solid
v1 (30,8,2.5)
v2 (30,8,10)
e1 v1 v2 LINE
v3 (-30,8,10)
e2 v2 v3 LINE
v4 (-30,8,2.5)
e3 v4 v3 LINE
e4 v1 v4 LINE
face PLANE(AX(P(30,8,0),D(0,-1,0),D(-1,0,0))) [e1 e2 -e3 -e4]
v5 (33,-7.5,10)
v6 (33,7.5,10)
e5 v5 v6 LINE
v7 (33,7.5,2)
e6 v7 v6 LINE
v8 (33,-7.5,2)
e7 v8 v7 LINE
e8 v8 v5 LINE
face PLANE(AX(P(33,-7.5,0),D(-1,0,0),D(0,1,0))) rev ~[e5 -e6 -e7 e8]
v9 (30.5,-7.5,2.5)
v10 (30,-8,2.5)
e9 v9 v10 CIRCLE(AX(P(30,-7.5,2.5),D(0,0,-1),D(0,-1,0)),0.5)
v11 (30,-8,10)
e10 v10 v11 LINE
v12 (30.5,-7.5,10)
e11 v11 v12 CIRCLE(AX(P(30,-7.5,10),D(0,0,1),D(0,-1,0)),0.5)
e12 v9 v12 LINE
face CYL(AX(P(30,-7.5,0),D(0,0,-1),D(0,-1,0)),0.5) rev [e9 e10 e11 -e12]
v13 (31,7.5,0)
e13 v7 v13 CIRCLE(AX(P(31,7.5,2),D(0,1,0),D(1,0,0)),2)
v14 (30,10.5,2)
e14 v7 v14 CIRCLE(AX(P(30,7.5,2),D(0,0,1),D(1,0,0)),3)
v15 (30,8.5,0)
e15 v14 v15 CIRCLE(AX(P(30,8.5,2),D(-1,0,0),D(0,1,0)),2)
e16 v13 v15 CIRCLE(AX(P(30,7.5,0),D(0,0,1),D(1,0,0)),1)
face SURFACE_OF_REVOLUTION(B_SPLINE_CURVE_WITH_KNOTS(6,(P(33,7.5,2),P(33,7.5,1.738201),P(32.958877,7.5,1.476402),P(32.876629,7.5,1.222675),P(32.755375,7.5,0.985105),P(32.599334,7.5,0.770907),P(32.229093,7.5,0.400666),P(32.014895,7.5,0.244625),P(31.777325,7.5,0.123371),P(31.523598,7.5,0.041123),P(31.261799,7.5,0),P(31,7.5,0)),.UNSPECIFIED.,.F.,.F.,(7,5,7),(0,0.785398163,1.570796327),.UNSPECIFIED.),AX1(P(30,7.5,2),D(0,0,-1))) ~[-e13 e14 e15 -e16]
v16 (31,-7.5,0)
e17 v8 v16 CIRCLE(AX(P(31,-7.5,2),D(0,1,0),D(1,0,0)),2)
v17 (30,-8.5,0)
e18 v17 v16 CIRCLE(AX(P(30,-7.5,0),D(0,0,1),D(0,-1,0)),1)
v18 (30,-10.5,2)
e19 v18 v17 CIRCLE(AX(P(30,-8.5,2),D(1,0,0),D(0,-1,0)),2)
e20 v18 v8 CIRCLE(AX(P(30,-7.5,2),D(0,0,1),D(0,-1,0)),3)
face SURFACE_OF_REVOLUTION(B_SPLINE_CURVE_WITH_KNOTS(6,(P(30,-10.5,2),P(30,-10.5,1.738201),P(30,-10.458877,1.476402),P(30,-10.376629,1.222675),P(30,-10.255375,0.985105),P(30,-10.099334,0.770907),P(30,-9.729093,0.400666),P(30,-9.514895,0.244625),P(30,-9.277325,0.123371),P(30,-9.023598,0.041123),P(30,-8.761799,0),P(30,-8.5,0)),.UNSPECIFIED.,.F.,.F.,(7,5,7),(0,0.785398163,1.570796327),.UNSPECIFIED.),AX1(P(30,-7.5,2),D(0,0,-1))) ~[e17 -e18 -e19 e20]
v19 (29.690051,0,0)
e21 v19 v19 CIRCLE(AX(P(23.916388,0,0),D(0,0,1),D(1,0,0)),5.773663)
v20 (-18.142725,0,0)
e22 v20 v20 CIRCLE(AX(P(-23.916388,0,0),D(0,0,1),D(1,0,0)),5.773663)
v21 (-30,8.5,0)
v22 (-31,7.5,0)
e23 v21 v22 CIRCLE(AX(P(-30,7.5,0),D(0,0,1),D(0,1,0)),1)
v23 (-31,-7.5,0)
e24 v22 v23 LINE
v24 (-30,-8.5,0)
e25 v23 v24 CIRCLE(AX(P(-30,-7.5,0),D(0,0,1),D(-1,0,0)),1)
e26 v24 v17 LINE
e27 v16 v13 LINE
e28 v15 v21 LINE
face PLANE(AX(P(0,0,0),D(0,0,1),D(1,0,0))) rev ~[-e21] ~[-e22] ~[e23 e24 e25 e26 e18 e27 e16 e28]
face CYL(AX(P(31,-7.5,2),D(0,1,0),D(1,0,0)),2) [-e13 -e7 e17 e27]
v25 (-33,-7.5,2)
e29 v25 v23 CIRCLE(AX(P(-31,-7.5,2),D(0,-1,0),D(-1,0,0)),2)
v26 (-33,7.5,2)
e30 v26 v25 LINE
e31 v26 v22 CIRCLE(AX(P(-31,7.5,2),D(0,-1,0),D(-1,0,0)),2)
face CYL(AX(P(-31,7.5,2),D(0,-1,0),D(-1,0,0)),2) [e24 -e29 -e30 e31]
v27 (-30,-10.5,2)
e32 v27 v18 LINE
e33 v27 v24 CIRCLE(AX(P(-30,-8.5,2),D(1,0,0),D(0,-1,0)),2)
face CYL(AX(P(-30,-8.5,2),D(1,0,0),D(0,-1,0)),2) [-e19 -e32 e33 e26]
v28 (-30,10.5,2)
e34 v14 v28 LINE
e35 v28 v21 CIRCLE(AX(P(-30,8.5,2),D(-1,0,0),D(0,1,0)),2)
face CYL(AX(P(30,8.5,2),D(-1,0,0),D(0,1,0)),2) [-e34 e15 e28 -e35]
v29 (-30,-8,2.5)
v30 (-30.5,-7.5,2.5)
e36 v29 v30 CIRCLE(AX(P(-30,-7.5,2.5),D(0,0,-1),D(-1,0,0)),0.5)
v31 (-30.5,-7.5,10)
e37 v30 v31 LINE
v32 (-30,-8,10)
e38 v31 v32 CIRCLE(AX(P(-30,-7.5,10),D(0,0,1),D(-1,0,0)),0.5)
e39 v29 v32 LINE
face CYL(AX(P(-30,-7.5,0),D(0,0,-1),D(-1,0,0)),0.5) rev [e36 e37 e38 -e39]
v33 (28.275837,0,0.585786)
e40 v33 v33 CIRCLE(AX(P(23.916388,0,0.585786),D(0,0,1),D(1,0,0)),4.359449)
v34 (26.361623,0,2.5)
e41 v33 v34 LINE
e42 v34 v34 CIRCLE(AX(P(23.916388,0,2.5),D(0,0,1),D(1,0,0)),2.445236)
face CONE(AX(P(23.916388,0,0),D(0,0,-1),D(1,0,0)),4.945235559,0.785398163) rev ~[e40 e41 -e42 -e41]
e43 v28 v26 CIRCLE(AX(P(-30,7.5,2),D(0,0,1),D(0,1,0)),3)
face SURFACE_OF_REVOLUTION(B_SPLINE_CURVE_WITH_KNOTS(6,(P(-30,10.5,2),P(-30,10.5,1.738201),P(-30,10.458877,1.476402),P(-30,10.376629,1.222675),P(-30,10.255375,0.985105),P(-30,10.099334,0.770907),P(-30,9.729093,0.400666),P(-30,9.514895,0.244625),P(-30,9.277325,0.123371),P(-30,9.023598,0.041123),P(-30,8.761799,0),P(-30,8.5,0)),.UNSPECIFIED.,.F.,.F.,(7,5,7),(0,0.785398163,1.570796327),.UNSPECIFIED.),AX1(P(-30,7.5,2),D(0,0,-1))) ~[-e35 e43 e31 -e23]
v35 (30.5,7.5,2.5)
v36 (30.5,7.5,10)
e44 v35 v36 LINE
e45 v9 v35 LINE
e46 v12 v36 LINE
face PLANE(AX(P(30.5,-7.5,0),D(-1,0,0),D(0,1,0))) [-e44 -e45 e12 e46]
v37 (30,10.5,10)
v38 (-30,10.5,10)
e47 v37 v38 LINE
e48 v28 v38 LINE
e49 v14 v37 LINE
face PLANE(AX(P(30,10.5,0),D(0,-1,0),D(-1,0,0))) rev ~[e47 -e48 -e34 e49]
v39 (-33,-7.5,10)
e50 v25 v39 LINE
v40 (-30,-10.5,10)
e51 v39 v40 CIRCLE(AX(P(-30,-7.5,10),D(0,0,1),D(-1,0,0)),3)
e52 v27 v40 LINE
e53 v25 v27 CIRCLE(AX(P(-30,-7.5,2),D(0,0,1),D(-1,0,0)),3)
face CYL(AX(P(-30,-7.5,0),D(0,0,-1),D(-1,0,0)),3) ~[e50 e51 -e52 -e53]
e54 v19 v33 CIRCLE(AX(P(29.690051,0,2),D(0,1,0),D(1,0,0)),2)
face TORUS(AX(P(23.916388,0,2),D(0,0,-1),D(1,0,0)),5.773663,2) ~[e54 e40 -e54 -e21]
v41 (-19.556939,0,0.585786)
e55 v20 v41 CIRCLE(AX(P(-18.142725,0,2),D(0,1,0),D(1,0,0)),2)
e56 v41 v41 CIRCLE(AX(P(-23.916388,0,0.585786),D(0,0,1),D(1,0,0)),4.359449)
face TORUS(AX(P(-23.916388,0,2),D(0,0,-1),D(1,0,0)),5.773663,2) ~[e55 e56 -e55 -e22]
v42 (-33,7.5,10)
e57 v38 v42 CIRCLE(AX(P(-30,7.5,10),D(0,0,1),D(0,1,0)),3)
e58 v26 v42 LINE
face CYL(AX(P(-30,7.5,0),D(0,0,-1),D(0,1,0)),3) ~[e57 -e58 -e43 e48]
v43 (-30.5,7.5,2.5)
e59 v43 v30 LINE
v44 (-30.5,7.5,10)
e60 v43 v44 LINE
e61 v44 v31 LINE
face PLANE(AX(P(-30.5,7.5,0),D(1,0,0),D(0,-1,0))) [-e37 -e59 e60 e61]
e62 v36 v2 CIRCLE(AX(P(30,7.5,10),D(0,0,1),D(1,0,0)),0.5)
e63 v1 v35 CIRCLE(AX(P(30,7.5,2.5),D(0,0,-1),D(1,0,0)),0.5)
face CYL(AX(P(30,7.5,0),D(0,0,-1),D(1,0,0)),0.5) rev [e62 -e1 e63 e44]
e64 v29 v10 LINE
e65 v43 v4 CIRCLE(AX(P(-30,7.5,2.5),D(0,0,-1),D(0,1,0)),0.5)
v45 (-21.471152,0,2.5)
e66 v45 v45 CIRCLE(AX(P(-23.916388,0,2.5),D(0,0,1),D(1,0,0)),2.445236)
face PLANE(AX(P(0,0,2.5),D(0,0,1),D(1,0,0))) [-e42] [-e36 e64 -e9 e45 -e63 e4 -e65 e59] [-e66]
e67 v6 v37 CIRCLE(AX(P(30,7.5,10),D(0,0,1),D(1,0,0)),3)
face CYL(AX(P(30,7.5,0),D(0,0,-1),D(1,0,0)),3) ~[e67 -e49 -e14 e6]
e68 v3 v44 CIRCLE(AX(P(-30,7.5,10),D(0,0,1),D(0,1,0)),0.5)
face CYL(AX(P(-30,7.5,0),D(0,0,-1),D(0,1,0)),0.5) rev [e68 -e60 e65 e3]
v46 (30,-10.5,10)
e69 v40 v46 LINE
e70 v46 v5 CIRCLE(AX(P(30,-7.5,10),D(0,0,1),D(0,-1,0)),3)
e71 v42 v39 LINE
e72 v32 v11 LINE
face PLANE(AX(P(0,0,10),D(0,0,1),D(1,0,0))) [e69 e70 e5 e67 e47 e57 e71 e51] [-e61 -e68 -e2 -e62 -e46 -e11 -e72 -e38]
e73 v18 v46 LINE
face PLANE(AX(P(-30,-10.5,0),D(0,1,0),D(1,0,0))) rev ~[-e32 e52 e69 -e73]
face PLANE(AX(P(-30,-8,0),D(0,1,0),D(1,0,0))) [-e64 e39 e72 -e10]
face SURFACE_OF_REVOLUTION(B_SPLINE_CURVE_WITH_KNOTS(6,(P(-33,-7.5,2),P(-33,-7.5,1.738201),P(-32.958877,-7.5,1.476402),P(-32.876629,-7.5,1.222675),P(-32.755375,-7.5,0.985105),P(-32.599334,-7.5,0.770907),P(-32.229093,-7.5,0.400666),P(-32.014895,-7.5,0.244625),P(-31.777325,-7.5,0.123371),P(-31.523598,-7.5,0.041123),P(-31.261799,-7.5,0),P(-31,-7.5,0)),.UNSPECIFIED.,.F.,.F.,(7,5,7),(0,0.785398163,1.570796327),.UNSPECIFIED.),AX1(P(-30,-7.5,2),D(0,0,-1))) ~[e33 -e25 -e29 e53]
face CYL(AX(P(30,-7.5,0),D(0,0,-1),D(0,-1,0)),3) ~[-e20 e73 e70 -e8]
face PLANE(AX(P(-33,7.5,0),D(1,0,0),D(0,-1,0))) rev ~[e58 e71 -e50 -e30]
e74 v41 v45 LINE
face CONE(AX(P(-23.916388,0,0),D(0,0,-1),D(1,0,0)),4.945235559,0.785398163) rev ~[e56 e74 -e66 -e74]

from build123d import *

# Parameters (mm, degrees)
F1_DEPTH = 10
F2_T     = -2.5
F3_R     = 1.9452355594
F4_DEPTH = 2.501
F6_R     = 2


# Not quite as in the source:
# - a fillet or chamfer that OpenCascade refuses, or shapes differently, is made with other operations: its cross-section is extruded or revolved along the edge and cut away or added


with BuildPart() as f1:
    # F0 (on Top) → F1 (new body)
    with BuildSketch(Plane.XY):
        with BuildLine():
            Line((-30, -10.5), (30, -10.5))
            ThreePointArc((30, -10.5), (32.1213203436, -9.6213203436), (33, -7.5))
            Line((33, -7.5), (33, 7.5))
            ThreePointArc((33, 7.5), (32.1213203436, 9.6213203436), (30, 10.5))
            Line((30, 10.5), (-30, 10.5))
            ThreePointArc((-30, 10.5), (-32.1213203436, 9.6213203436), (-33, 7.5))
            Line((-33, 7.5), (-33, -7.5))
            ThreePointArc((-33, -7.5), (-32.1213203436, -9.6213203436), (-30, -10.5))
        make_face()
    extrude(amount=F1_DEPTH)

    # F2
    f2_openings = [f1.faces().sort_by_distance(p)[0] for p in [
        (0, 0, 10),
    ]]
    offset(amount=F2_T, openings=f2_openings)

    # F3 (on face) → F4 (cut, through all)
    with BuildSketch(Plane.XY.offset(2.5)):
        with Locations((-23.9163879305, 0)):
            Circle(F3_R)
        with Locations((23.9163879305, 0)):
            Circle(F3_R)
    extrude(amount=-F4_DEPTH, mode=Mode.SUBTRACT)

    # F5: chamfer of 3 on 2 edges, made by hand

    # F5_s1 → F5_t2 (revolve, cut)
    with BuildSketch(Plane.XZ):
        Polygon((28.8616234899, 0), (25.8616234899, 3), (25.8616234899, 0), align=None)
    revolve(axis=Axis((23.9163879305, 0, 0), (0, 0, 1)), mode=Mode.SUBTRACT)

    # F5_s3 → F5_t4 (revolve, cut)
    with BuildSketch(Plane.XZ):
        Polygon((-18.9711523711, 0), (-21.9711523711, 3), (-21.9711523711, 0), align=None)
    revolve(axis=Axis((-23.9163879305, 0, 0), (0, 0, 1)), mode=Mode.SUBTRACT)

    # F6
    f6_edges = [f1.edges().sort_by_distance(p)[0] for p in [
        (0, -10.5, 0),
        (-32.12132, -9.62132, 0),
        (32.12132, -9.62132, 0),
        (-33, 0, 0),
        (33, 0, 0),
        (-32.12132, 9.62132, 0),
        (32.12132, 9.62132, 0),
        (0, 10.5, 0),
        (-28.861623, 0, 0),
        (18.971152, 0, 0),
    ]]
    fillet(f6_edges, radius=F6_R)


solid = f1.part
